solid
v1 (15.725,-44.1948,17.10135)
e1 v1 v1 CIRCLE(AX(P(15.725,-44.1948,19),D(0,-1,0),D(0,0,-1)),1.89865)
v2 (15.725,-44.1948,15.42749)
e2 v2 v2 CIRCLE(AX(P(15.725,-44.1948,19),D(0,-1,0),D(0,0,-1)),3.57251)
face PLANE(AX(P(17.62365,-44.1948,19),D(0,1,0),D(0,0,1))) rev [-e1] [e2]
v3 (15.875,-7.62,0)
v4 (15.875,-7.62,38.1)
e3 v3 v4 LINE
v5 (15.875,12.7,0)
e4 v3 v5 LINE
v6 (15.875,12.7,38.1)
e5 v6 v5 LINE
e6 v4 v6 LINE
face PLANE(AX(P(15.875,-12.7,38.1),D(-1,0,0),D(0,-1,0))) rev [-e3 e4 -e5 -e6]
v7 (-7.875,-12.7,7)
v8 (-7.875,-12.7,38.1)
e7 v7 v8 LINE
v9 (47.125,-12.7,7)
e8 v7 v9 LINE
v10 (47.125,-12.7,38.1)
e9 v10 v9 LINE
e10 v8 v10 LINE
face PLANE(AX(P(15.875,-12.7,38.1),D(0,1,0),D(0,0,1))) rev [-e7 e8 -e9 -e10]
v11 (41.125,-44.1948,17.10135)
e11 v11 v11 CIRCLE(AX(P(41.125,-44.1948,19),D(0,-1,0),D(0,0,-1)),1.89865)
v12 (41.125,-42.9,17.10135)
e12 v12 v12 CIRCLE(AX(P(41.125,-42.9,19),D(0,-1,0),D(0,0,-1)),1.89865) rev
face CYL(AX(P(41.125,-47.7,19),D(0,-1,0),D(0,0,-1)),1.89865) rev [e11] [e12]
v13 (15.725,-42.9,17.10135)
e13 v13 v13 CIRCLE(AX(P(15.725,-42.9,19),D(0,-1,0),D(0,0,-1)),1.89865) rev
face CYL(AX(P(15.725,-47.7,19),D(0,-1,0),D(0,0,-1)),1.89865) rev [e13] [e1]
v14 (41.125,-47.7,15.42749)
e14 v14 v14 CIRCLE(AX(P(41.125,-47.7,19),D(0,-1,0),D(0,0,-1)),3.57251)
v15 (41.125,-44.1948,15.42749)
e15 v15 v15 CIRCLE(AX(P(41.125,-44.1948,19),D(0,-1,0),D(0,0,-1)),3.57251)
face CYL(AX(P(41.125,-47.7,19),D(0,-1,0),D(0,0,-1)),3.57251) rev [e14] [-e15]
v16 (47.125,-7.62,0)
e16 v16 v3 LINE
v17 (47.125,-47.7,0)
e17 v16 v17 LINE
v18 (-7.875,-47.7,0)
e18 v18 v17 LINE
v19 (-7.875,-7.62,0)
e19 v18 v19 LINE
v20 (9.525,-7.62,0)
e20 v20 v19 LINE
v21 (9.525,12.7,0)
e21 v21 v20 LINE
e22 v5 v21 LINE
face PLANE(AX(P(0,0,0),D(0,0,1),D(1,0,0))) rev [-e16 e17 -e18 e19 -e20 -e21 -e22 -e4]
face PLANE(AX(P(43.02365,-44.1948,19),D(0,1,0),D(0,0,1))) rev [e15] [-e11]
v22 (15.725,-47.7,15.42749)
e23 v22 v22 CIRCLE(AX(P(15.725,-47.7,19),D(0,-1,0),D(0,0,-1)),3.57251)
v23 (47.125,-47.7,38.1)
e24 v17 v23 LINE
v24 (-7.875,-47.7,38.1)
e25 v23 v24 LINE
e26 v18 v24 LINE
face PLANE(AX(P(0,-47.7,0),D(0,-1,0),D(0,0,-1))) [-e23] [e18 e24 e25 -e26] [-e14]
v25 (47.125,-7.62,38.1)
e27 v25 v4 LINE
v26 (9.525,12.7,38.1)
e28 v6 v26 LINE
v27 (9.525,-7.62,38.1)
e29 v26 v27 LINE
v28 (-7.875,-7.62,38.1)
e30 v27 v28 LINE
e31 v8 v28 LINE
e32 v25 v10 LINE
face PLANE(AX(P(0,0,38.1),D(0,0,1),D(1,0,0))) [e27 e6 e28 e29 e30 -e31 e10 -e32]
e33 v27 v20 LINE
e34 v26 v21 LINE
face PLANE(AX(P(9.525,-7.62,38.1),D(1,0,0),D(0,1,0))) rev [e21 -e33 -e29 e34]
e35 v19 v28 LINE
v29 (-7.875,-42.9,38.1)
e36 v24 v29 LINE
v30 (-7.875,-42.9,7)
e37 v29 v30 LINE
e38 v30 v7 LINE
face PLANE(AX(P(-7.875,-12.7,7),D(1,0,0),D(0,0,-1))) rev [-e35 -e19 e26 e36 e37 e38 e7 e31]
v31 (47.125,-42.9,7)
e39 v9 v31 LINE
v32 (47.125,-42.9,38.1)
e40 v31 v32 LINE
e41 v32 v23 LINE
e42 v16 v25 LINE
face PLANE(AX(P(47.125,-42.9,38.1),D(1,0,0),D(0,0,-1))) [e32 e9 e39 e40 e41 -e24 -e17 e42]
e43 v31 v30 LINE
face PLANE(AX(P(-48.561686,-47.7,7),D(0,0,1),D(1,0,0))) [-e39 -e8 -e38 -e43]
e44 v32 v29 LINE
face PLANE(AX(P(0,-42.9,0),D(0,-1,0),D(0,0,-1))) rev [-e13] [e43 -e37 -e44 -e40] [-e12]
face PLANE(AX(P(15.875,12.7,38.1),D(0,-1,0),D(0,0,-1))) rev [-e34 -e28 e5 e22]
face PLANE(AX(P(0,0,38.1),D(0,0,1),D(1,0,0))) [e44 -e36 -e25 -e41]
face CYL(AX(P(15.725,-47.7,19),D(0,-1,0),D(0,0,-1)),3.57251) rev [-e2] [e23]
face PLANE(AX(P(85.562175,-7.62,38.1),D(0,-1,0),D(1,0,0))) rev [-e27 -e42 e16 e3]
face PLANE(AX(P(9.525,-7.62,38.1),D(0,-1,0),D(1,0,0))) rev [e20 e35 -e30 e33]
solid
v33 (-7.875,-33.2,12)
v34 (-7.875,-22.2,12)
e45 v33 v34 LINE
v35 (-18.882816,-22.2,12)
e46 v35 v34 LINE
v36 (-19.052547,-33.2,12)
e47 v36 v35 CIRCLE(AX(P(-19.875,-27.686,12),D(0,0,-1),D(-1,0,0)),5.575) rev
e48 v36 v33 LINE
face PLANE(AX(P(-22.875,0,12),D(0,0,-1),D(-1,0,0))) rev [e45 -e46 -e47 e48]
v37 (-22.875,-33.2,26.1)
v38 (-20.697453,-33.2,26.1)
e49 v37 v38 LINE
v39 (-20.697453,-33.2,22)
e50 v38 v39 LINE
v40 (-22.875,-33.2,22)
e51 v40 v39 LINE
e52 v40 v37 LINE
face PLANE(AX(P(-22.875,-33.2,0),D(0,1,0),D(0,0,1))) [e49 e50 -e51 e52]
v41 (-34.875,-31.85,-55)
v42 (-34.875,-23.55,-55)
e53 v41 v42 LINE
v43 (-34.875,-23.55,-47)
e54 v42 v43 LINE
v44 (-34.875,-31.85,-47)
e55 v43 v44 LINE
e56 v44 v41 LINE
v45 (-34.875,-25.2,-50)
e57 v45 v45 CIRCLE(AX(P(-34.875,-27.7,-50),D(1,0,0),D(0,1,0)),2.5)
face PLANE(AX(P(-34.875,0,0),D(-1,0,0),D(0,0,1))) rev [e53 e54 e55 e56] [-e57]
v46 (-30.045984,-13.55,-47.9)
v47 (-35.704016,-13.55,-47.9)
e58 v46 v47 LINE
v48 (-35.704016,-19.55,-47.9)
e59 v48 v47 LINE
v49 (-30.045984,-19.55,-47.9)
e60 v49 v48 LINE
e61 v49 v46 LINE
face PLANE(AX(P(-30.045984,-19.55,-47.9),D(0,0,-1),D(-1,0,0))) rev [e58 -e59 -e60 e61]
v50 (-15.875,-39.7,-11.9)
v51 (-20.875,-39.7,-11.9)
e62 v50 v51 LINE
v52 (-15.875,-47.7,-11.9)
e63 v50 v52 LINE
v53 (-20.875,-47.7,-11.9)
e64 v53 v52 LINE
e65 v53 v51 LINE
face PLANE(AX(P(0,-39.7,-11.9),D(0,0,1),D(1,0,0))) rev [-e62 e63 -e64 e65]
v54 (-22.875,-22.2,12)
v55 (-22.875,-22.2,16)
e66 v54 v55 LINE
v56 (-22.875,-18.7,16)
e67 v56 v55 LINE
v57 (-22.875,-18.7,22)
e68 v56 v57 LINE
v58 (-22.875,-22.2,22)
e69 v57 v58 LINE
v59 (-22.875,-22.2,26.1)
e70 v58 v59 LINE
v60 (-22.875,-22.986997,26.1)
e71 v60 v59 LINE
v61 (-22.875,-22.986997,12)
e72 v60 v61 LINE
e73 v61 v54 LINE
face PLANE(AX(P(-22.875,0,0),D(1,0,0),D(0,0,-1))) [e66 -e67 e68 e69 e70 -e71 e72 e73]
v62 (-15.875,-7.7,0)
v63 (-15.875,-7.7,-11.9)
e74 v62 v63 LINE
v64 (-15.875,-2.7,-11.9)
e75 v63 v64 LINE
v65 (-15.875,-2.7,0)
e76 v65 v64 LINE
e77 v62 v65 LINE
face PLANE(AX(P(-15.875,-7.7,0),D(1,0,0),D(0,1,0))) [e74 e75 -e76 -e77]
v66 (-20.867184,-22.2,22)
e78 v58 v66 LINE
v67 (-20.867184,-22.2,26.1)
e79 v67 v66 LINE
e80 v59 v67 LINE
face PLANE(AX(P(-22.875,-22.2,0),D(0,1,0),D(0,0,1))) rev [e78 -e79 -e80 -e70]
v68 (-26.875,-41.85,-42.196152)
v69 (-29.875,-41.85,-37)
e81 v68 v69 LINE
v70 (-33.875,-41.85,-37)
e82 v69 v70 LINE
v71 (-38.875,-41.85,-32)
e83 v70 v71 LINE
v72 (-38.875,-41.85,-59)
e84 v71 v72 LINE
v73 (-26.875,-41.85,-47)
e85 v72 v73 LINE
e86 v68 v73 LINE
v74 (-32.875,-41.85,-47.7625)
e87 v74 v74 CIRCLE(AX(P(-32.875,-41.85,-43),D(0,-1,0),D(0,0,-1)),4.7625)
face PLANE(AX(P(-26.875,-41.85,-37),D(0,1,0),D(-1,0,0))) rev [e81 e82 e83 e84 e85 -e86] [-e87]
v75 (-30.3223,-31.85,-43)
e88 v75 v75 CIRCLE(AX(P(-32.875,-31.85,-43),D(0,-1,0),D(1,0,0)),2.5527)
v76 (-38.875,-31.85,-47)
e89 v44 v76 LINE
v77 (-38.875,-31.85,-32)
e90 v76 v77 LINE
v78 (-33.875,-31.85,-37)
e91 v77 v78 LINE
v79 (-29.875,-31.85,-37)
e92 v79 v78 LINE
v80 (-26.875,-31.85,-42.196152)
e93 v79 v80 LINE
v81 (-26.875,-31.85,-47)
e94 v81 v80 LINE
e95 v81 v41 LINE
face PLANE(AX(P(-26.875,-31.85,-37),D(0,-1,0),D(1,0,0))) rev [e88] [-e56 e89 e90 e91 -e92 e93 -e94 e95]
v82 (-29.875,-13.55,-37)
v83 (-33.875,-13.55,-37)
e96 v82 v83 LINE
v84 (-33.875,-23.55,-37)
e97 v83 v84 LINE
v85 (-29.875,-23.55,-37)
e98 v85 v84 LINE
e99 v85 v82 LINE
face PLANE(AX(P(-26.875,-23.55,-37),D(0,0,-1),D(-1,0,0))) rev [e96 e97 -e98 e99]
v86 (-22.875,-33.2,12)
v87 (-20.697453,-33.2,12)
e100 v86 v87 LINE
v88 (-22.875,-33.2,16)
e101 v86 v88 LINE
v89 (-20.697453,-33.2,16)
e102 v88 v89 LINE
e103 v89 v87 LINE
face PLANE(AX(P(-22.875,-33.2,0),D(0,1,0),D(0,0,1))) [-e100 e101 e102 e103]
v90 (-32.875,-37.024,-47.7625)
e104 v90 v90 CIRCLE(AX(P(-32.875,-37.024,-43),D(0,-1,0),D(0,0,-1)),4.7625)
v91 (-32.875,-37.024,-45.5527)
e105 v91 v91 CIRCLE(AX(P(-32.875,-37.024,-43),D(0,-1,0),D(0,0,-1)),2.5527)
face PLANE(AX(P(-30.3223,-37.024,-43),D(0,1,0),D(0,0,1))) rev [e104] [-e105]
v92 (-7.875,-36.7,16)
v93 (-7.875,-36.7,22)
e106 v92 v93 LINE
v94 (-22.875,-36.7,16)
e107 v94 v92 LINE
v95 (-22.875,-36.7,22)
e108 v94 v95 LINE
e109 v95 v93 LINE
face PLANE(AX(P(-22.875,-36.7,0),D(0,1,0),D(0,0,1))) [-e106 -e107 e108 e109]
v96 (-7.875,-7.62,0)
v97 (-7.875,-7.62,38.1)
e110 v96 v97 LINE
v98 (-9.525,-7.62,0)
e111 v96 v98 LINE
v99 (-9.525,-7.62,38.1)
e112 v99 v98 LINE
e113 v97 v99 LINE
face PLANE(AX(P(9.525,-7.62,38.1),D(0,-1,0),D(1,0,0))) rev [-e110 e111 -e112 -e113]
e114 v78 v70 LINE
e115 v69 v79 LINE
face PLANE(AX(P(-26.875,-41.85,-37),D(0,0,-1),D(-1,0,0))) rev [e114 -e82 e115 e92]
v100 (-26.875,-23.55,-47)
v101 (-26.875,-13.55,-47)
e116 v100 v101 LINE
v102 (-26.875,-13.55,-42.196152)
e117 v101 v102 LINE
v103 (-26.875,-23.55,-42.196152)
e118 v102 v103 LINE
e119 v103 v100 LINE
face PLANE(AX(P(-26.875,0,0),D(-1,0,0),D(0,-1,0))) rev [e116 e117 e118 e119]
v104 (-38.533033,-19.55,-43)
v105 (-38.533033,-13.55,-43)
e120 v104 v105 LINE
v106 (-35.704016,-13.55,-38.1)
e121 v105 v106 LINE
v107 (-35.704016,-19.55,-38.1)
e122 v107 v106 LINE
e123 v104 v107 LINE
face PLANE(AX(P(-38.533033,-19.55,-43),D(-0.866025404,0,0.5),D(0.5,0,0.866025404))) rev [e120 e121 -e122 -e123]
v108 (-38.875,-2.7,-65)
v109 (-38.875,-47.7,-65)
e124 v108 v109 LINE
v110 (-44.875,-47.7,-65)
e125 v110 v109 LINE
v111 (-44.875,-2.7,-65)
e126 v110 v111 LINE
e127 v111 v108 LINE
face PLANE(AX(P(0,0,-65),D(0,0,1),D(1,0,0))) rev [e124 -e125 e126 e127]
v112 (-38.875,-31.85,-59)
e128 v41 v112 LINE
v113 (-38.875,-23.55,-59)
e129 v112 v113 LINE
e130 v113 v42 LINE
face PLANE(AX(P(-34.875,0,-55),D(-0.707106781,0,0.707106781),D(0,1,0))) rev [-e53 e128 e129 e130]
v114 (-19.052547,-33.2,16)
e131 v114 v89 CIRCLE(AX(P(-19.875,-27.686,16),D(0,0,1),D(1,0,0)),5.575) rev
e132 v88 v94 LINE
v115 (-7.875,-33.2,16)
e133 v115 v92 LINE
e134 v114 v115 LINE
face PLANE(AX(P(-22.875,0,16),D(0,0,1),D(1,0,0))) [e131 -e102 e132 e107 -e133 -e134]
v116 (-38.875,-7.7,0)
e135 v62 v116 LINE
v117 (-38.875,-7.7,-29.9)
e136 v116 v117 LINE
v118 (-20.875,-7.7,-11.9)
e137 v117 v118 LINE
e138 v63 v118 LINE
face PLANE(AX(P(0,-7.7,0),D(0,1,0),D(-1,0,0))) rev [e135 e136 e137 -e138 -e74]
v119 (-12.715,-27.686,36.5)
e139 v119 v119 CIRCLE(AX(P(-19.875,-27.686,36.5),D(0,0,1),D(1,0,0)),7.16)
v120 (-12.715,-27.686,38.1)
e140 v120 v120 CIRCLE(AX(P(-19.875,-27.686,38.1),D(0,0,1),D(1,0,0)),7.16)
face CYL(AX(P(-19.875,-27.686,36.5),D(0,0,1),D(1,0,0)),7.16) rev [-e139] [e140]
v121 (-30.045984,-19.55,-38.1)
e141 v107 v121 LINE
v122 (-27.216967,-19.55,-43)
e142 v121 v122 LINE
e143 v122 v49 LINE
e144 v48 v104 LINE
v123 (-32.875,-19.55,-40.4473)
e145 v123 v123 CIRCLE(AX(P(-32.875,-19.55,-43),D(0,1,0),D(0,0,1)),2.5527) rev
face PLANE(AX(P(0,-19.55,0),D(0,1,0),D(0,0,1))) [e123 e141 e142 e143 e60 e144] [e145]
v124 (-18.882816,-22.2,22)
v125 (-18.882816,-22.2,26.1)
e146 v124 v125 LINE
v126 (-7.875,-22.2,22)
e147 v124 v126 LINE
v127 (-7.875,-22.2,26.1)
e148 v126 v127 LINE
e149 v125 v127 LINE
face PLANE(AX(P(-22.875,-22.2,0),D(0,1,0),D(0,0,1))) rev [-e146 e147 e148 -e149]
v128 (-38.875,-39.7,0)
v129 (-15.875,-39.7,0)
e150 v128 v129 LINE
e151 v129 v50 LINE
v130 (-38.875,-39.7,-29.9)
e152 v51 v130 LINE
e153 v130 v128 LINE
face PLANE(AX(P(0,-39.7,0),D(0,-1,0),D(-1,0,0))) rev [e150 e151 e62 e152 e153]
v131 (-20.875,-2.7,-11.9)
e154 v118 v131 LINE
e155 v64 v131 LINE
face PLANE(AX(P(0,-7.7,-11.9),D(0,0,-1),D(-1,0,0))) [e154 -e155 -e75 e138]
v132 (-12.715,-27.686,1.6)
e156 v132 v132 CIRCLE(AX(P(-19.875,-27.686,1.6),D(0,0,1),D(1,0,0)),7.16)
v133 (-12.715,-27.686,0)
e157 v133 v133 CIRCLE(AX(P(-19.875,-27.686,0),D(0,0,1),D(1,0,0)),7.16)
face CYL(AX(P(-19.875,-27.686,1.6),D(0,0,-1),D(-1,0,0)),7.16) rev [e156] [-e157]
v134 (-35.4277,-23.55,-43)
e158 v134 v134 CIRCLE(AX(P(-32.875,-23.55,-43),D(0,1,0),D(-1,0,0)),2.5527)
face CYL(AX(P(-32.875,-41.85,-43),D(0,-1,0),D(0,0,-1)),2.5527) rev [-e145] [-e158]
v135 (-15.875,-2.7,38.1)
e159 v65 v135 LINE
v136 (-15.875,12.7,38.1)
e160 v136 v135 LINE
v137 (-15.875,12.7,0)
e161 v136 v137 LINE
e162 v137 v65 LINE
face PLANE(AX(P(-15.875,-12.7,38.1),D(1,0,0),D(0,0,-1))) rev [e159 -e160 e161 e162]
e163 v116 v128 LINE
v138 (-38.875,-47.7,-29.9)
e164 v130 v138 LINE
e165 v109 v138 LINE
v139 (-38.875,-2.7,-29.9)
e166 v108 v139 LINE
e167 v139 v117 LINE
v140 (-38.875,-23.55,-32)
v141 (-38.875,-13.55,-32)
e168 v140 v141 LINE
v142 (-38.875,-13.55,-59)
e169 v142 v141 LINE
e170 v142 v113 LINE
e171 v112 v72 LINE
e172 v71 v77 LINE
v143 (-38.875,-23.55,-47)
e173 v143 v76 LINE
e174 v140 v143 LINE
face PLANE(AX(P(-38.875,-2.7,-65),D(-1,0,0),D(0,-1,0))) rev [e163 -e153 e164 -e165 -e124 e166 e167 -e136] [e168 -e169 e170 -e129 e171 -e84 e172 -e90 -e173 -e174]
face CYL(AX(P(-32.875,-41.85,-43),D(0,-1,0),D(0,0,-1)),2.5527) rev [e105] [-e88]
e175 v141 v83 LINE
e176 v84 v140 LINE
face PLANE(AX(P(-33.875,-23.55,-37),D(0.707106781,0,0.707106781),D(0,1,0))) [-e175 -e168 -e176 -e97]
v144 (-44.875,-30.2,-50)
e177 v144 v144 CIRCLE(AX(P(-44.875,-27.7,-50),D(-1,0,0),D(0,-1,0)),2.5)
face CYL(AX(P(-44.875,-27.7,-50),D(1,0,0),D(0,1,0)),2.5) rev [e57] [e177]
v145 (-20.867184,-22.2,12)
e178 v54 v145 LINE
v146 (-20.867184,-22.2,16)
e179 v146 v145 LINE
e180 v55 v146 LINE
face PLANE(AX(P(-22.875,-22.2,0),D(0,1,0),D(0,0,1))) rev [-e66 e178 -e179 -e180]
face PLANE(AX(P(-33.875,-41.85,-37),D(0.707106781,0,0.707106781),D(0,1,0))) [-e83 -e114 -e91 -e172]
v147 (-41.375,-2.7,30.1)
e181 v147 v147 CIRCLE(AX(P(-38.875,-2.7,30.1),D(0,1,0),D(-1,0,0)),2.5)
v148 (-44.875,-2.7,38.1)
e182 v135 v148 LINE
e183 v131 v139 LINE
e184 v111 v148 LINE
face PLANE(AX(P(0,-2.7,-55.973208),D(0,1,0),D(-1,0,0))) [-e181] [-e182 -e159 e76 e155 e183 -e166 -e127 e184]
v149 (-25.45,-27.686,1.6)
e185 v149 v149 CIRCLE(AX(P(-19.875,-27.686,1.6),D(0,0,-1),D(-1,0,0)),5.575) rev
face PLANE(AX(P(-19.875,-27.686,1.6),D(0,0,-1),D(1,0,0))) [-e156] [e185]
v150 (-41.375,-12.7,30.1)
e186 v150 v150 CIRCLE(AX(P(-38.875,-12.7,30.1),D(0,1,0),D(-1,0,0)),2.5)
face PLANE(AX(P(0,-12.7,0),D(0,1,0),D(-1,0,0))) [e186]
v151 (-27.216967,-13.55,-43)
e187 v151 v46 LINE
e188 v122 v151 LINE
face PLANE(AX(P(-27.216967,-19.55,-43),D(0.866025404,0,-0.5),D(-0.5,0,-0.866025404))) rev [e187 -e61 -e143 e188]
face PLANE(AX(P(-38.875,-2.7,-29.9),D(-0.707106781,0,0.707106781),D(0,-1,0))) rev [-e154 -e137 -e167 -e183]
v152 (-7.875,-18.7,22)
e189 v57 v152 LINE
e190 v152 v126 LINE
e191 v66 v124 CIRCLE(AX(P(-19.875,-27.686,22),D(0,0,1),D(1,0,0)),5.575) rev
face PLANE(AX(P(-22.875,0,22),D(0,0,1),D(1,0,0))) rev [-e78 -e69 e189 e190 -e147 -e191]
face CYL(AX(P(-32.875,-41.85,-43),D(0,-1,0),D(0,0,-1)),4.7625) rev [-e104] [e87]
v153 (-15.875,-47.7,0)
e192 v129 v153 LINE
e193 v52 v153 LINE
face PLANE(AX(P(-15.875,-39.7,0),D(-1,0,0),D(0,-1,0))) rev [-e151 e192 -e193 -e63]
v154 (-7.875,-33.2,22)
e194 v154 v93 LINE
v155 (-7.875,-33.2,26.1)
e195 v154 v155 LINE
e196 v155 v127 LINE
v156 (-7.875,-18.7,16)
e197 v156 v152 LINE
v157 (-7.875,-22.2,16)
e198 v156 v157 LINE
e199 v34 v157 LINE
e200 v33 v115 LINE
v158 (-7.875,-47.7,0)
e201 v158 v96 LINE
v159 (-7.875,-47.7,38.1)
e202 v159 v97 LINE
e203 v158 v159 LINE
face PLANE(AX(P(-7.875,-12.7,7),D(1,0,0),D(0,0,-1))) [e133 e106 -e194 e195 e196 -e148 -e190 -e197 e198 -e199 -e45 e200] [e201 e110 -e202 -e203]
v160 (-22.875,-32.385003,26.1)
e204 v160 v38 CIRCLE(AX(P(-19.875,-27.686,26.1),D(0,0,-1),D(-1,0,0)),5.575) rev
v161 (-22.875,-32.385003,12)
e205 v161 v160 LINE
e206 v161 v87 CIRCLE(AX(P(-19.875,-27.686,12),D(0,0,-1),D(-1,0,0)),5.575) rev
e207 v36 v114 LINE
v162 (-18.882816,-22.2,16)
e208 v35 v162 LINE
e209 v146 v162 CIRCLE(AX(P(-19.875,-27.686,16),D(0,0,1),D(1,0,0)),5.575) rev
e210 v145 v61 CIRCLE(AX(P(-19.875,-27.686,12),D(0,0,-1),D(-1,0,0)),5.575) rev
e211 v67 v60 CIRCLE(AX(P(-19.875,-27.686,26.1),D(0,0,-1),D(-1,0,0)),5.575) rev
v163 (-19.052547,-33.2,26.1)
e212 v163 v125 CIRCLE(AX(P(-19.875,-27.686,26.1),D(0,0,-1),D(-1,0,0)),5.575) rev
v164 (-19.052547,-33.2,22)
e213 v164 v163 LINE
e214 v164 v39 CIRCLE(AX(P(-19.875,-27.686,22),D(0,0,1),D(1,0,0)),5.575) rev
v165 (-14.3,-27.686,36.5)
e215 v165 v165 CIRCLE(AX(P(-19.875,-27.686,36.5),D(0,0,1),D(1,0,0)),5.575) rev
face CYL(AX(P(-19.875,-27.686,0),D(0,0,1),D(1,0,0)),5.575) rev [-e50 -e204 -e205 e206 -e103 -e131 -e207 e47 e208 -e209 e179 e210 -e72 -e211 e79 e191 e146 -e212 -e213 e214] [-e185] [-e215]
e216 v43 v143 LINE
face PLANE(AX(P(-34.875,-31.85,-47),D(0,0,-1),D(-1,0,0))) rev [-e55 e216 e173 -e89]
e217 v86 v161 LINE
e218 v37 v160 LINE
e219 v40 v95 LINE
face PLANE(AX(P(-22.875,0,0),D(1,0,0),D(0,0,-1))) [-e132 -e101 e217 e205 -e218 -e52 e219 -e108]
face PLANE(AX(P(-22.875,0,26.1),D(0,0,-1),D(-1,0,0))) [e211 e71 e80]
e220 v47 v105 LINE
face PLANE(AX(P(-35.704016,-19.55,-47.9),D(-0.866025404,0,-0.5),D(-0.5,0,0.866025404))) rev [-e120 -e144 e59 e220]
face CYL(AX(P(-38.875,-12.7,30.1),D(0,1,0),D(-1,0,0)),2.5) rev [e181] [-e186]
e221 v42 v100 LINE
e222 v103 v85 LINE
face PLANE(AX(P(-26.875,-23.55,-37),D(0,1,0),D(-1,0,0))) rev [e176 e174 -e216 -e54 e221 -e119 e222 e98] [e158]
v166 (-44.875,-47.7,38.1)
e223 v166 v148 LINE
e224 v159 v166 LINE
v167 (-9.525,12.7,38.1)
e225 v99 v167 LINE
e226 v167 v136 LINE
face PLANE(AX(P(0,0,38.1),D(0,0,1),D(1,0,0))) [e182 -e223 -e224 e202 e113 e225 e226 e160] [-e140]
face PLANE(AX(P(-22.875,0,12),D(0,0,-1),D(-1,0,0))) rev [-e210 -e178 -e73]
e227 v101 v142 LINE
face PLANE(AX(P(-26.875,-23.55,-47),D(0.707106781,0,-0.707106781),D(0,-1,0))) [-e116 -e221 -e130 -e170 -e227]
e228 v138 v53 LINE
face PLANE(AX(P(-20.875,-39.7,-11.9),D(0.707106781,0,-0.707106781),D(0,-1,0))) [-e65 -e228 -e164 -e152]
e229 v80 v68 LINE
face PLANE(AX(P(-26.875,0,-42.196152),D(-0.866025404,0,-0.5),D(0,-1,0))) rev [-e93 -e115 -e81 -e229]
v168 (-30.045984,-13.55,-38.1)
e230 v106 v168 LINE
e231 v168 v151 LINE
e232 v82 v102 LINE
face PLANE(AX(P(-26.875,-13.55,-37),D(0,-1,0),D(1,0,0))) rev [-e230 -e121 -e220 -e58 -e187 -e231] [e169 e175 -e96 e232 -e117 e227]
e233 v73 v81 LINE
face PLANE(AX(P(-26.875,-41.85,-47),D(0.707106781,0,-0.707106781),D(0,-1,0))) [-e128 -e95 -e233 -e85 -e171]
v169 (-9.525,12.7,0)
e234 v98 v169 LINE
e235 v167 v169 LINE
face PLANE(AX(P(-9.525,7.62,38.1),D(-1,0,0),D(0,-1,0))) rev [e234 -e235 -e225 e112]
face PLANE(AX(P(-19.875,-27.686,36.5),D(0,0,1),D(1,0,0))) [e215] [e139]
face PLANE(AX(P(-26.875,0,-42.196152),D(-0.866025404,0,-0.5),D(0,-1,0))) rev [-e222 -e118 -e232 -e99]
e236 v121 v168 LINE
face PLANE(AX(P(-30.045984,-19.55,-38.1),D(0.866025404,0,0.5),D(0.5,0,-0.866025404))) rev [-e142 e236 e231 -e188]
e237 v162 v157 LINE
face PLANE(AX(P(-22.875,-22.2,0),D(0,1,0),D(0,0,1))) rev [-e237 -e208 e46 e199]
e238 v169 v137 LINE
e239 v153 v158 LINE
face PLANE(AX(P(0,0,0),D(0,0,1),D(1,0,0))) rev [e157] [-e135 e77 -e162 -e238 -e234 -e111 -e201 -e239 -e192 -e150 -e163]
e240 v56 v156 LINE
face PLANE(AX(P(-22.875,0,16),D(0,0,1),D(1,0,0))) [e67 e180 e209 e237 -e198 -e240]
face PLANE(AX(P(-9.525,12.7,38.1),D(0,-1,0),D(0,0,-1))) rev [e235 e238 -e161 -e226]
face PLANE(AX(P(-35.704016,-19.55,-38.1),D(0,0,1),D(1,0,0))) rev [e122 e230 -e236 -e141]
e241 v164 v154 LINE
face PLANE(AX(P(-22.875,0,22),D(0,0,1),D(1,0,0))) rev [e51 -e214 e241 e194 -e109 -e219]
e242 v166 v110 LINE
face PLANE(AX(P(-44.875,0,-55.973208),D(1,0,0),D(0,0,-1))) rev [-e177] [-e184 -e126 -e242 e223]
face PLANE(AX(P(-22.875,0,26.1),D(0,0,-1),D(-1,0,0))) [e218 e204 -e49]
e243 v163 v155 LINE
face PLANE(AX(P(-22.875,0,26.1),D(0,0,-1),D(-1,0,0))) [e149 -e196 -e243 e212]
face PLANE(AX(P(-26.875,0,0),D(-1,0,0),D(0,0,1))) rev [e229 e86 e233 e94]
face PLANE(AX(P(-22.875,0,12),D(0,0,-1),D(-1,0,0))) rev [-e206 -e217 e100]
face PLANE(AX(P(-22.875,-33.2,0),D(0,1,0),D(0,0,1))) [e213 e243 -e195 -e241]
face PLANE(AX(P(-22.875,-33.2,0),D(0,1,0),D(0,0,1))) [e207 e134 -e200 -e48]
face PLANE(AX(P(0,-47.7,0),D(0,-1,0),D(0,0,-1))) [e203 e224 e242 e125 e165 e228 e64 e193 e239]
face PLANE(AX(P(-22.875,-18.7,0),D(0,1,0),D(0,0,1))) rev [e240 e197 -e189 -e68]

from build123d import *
from OCP.BRepFilletAPI import BRepFilletAPI_MakeChamfer

# Parameters (mm, degrees)
BOSS_EXTRUDE1_DEPTH                             = 38.1
BOSS_EXTRUDE2_DEPTH                             = 38.1
SKETCH3_R                                       = 5.575
CUT_EXTRUDE1_DEPTH                              = 74.915259757
SKETCH4_W                                       = 6
SKETCH4_H                                       = 42
BOSS_EXTRUDE3_DEPTH                             = 65
SKETCH6_W                                       = 23
SKETCH6_H                                       = 11.9
BOSS_EXTRUDE4_DEPTH                             = 5
SKETCH10_R                                      = 2.5
CUT_EXTRUDE4_DEPTH                              = 97.024228713
SKETCH12_W                                      = 14.1
SKETCH12_H                                      = 11
SKETCH12_W_2                                    = 6
SKETCH12_H_2                                    = 18
CUT_EXTRUDE5_DEPTH                              = 15
BOSS_EXTRUDE6_DEPTH                             = 3
BOSS_EXTRUDE6_DEPTH_BACK                        = 1.8
SKETCH13_W                                      = 92
SKETCH13_H                                      = 38.1
SKETCH14_R                                      = 1.5
CUT_EXTRUDE6_DEPTH                              = 4.8
SKETCH15_W                                      = 38.1
SKETCH15_H                                      = 5.08
BOSS_EXTRUDE7_DEPTH                             = 31.25
SKETCH17_R                                      = 7.16
CUT_EXTRUDE7_DEPTH                              = 1.6
SKETCH19_W                                      = 7
SKETCH19_H                                      = 40.08
BOSS_EXTRUDE9_DEPTH                             = 55
SKETCH20_W                                      = 10
SKETCH20_H                                      = 10
BOSS_EXTRUDE10_DEPTH                            = 12
CUT_EXTRUDE8_REACH                              = 99.064
SKETCH21_R                                      = 2.5
CHAMFER2_SIZE                                   = 12
BOSS_EXTRUDE11_START                            = 4
SKETCH22_W                                      = 12
SKETCH22_H                                      = 8.3
SKETCH22_R                                      = 2.5
BOSS_EXTRUDE11_DEPTH                            = 4
CHAMFER3_SIZE                                   = 4
CBORE_FOR_10_SOCKET_HEAD_CAP_SCREW1_D           = 5.1054
CBORE_FOR_10_SOCKET_HEAD_CAP_SCREW1_CBORE_D     = 9.525
CBORE_FOR_10_SOCKET_HEAD_CAP_SCREW1_CBORE_DEPTH = 4.826
CUT_EXTRUDE9_DEPTH                              = 6
CHAMFER7_SIZE                                   = 5
CHAMFER8_SIZE                                   = 18
CHAMFER8_OF_MIRROR2_SIZE                        = 18
BOSS_EXTRUDE12_DEPTH                            = 3
CHAMFER10_SIZE                                  = 3
CHAMFER10_SIZE2                                 = 5.196152423
CBORE_START                                     = -47.7
CBORE_FOR_6_SOCKET_HEAD_CAP_SCREW1_OUTL_R       = 3.57251
CBORE_FOR_6_SOCKET_HEAD_CAP_SCREW1_OUTL_R_2     = 1.5
CBORE_FOR_6_SOCKET_HEAD_CAP_SCREW1_DEPTH        = 3.5052
CBORE_START_2                                   = -44.1948
CBORE_FOR_6_SOCKET_HEAD_CAP_SCREW1_2_OU_R       = 1.89865
CBORE_FOR_6_SOCKET_HEAD_CAP_SCREW1_2_OU_R_2     = 1.5
CBORE_FOR_6_SOCKET_HEAD_CAP_SCREW1_2_DEPTH      = 1.2948
SKETCH11_R                                      = 2.5
CUT_EXTRUDE11_DEPTH                             = 10


# Read off the part's stored shape, not the designer's step: CBORE for #6 Socket Head Cap Screw1, Split1
with BuildPart() as part:
    # Sketch1 → Boss-Extrude1 (new body)
    with BuildSketch(Plane.XY):
        Polygon((-9.525, 7.62), (-9.525, 12.7), (-15.875, 12.7), (-15.875, -12.7), (15.875, -12.7), (15.875, 12.7), (9.525, 12.7), (9.525, 7.62), (9.525, -7.62), (-9.525, -7.62), align=None)
    extrude(amount=BOSS_EXTRUDE1_DEPTH)

    # Sketch2 → Boss-Extrude2 (add)
    with BuildSketch(Plane.XY.offset(38.1)):
        Polygon((-44.875, -44.7), (-7.875, -44.7), (-7.875, -12.7), (-15.875, -12.7), (-15.875, -2.7), (-44.875, -2.7), align=None)
    extrude(amount=-BOSS_EXTRUDE2_DEPTH)

    # Sketch3 → Cut-Extrude1 (cut, through all)
    with BuildSketch(Plane.XY.offset(38.1)):
        with Locations((-19.875, -27.686)):
            Circle(SKETCH3_R)
    extrude(amount=-CUT_EXTRUDE1_DEPTH, mode=Mode.SUBTRACT)

    # Sketch4 → Boss-Extrude3 (add)
    with BuildSketch(Plane(origin=(0, 0, 0), x_dir=(-1, 0, 0), z_dir=(0, 0, -1))):
        with Locations((41.875, -23.7)):
            Rectangle(SKETCH4_W, SKETCH4_H)
    extrude(amount=BOSS_EXTRUDE3_DEPTH)

    # Sketch6 → Boss-Extrude4 (add)
    with BuildSketch(Plane(origin=(0, -2.7, 0), x_dir=(1, 0, 0), z_dir=(0, 1, 0))):
        with Locations((-27.375, 5.95)):
            Rectangle(SKETCH6_W, SKETCH6_H)
        Polygon((-38.875, 0), (-38.875, 11.9), (-44.875, 11.9), (-44.875, -38.1), (-15.875, -38.1), (-15.875, 0), align=None)
    boss_extrude4 = extrude(amount=-BOSS_EXTRUDE4_DEPTH)

    # Sketch10 → Cut-Extrude4 (cut, through all)
    with BuildSketch(Plane.ZY.offset(38.875)):
        with Locations(Location((-50, -27.7, 0), (0, 0, 270))):
            Circle(SKETCH10_R)
    extrude(amount=CUT_EXTRUDE4_DEPTH, mode=Mode.SUBTRACT)

    # Sketch12 → Cut-Extrude5 (cut)
    with BuildSketch(Plane(origin=(-7.875, 0, 58.8), x_dir=(0, 0, 1), z_dir=(-1, 0, 0))):
        with Locations((-39.75, -27.7)):
            Rectangle(SKETCH12_W, SKETCH12_H)
        with Locations((-39.8, -27.7)):
            Rectangle(SKETCH12_W_2, SKETCH12_H_2)
    extrude(amount=CUT_EXTRUDE5_DEPTH, mode=Mode.SUBTRACT)

    # Sketch13 → Boss-Extrude6 (add, two sides: drawn at the far end of the back side and taken through both)
    with BuildSketch(Plane.XZ.offset(44.7).offset(-BOSS_EXTRUDE6_DEPTH_BACK)):
        with Locations((1.125, 19.05)):
            Rectangle(SKETCH13_W, SKETCH13_H)
    extrude(amount=BOSS_EXTRUDE6_DEPTH + BOSS_EXTRUDE6_DEPTH_BACK)

    # Sketch14 → Cut-Extrude6 (cut)
    with BuildSketch(Plane.XZ.offset(47.7)):
        with Locations(Location((15.725, 19, 0), (0, 0, 270))):
            Circle(SKETCH14_R)
        with Locations(Location((41.125, 19, 0), (0, 0, 270))):
            Circle(SKETCH14_R)
    extrude(amount=-CUT_EXTRUDE6_DEPTH, mode=Mode.SUBTRACT)

    # Sketch15 → Boss-Extrude7 (add)
    with BuildSketch(Plane(origin=(15.875, 0, 0), x_dir=(0, 0, -1), z_dir=(1, 0, 0))):
        with Locations((-19.05, -10.16)):
            Rectangle(SKETCH15_W, SKETCH15_H)
    extrude(amount=BOSS_EXTRUDE7_DEPTH)

    # Sketch17 → Cut-Extrude7 (cut)
    with BuildSketch(Plane.XY.offset(38.1)):
        with Locations((-19.875, -27.686)):
            Circle(SKETCH17_R)
    cut_extrude7 = extrude(amount=-CUT_EXTRUDE7_DEPTH, mode=Mode.SUBTRACT)

    # Mirror1: Cut-Extrude7 across plane
    add(cut_extrude7.mirror(Plane.XY.offset(19.05)), mode=Mode.SUBTRACT)

    # Sketch19 → Boss-Extrude9 (add)
    with BuildSketch(Plane(origin=(47.125, 0, 0), x_dir=(0, 0, -1), z_dir=(1, 0, 0))):
        with Locations((-3.5, -27.66)):
            Rectangle(SKETCH19_W, SKETCH19_H)
    extrude(amount=-BOSS_EXTRUDE9_DEPTH)

    # Sketch20 → Boss-Extrude10 (add)
    with BuildSketch(Plane(origin=(-38.875, 0, 0), x_dir=(0, 0, -1), z_dir=(1, 0, 0))):
        with Locations((42, -36.85)):
            Rectangle(SKETCH20_W, SKETCH20_H)
        with Locations((42, -18.55)):
            Rectangle(SKETCH20_W, SKETCH20_H)
    extrude(amount=BOSS_EXTRUDE10_DEPTH)

    # Cut-Extrude8: up to this face of the body (flat: up to its plane)
    cut_extrude8_end = Plane(part.part.faces().sort_by_distance((-32.875, -13.55, -42))[0])
    # Sketch21 → Cut-Extrude8 (cut, up to the picked face)
    with BuildSketch(Plane.XZ.offset(41.85), mode=Mode.PRIVATE) as cut_extrude8_sk1:
        with Locations((-32.875, -43)):
            Circle(SKETCH21_R)
    cut_extrude8_tool1 = split(extrude(cut_extrude8_sk1.sketch, amount=-CUT_EXTRUDE8_REACH, mode=Mode.PRIVATE), bisect_by=cut_extrude8_end, keep=Keep.BOTH, mode=Mode.PRIVATE)
    add(cut_extrude8_tool1.solids().sort_by(Axis((-32.875, -41.85, -43), (0, 1, 0)))[0], mode=Mode.SUBTRACT)

    # Chamfer2
    chamfer2_edges = [part.edges().sort_by_distance(p)[0] for p in [
        (-38.875, -18.55, -47),
        (-38.875, -36.85, -47),
    ]]
    chamfer(chamfer2_edges, length=CHAMFER2_SIZE - 0.0001)  # a hair under: the kernel refuses the full size

    # Sketch22 → Boss-Extrude11 (add)
    with BuildSketch(Plane(origin=(-38.875, 0, 0), x_dir=(0, 0, -1), z_dir=(1, 0, 0)).offset(BOSS_EXTRUDE11_START)):
        with Locations((53, -27.7)):
            Rectangle(SKETCH22_W, SKETCH22_H)
        with Locations(Location((50, -27.7, 0), (0, 0, 90))):
            Circle(SKETCH22_R, mode=Mode.SUBTRACT)
    extrude(amount=-BOSS_EXTRUDE11_DEPTH)

    # Chamfer3
    chamfer3_edges = [part.edges().sort_by_distance(p)[0] for p in [
        (-34.875, -27.7, -59),
    ]]
    chamfer(chamfer3_edges, length=CHAMFER3_SIZE - 0.0001)  # a hair under: the kernel refuses the full size

    # CBORE for #10 Socket Head Cap Screw1 (through all)
    with Locations(Plane(origin=(0, -41.85, 0), x_dir=(-1, 0, 0), z_dir=(0, -1, 0))):
        with Locations((32.875, 43)):
            CounterBoreHole(CBORE_FOR_10_SOCKET_HEAD_CAP_SCREW1_D / 2, CBORE_FOR_10_SOCKET_HEAD_CAP_SCREW1_CBORE_D / 2, CBORE_FOR_10_SOCKET_HEAD_CAP_SCREW1_CBORE_DEPTH)

    # Sketch25 → Cut-Extrude9 (cut)
    with BuildSketch(Plane(origin=(0, -13.55, 0), x_dir=(1, 0, 0), z_dir=(0, 1, 0))):
        Polygon((-35.704016319, 38.1), (-30.045983681, 38.1), (-27.216967362, 43), (-30.045983681, 47.9), (-35.704016319, 47.9), (-38.533032638, 43), align=None)
    extrude(amount=-CUT_EXTRUDE9_DEPTH, mode=Mode.SUBTRACT)

    # Chamfer7
    chamfer7_edges = [part.edges().sort_by_distance(p)[0] for p in [
        (-38.875, -36.85, -37),
        (-38.875, -18.55, -37),
    ]]
    chamfer(chamfer7_edges, length=CHAMFER7_SIZE)

    # Chamfer8
    chamfer8_edges = [part.edges().sort_by_distance(p)[0] for p in [
        (-38.875, -5.2, -11.9),
    ]]
    chamfer(chamfer8_edges, length=CHAMFER8_SIZE)

    # Mirror2: Boss-Extrude4 across plane
    add(boss_extrude4.mirror(Plane(origin=(0, -23.7, 0), x_dir=(0, 0, 1), z_dir=(0, -1, 0))))

    # Chamfer8 of Mirror2
    chamfer8_of_mirror2_edges = [part.edges().sort_by_distance(p)[0] for p in [
        (-38.875, -42.2, -11.9),
    ]]
    chamfer(chamfer8_of_mirror2_edges, length=CHAMFER8_OF_MIRROR2_SIZE)

    # Sketch27 → Boss-Extrude12 (add)
    with BuildSketch(Plane.XZ.offset(44.7)):
        Polygon((-15.875, 0), (-44.875, 0), (-44.875, -65), (-38.875, -65), (-38.875, -29.9), (-20.875, -11.9), (-15.875, -11.9), align=None)
    extrude(amount=BOSS_EXTRUDE12_DEPTH)

    # Chamfer10: one chamfer whose edges measure the first distance from different faces: ONE call of the kernel's chamfer builder (chamfer() names one face for all edges)
    chamfer10_edges_1 = [part.edges().sort_by_distance(p)[0] for p in [
        (-26.875, -36.85, -37),
    ]]
    chamfer10_side_1 = [part.faces().sort_by_distance(p)[0] for p in [
        (-30.375, -36.85, -37),
    ]]
    chamfer10_edges_2 = [part.edges().sort_by_distance(p)[0] for p in [
        (-26.875, -18.55, -37),
    ]]
    chamfer10_side_2 = [part.faces().sort_by_distance(p)[0] for p in [
        (-30.375, -18.55, -37),
    ]]
    chamfer10 = BRepFilletAPI_MakeChamfer(part.part.solid().wrapped)
    for e in chamfer10_edges_1:
        chamfer10.Add(CHAMFER10_SIZE, CHAMFER10_SIZE2, e.wrapped, chamfer10_side_1[0].wrapped)  # the first distance lies on this face
    for e in chamfer10_edges_2:
        chamfer10.Add(CHAMFER10_SIZE, CHAMFER10_SIZE2, e.wrapped, chamfer10_side_2[0].wrapped)  # the first distance lies on this face
    add(Compound.cast(chamfer10.Shape()), mode=Mode.REPLACE)

    # CBORE for #6 Socket Head Cap Screw1 outl → CBORE for #6 Socket Head Cap Screw1 (cut)
    # profile 1 of 2: a face of its own
    with BuildSketch(Plane(origin=(0, 0, 0), x_dir=(1, 0, 0), z_dir=(0, 1, 0)).offset(CBORE_START)):
        with Locations((41.125, -19)):
            Circle(CBORE_FOR_6_SOCKET_HEAD_CAP_SCREW1_OUTL_R)
        with Locations((41.125, -19)):
            Circle(CBORE_FOR_6_SOCKET_HEAD_CAP_SCREW1_OUTL_R_2, mode=Mode.SUBTRACT)
    # profile 2 of 2: a face of its own
    with BuildSketch(Plane(origin=(0, 0, 0), x_dir=(1, 0, 0), z_dir=(0, 1, 0)).offset(CBORE_START)):
        with Locations((15.725, -19)):
            Circle(CBORE_FOR_6_SOCKET_HEAD_CAP_SCREW1_OUTL_R)
        with Locations((15.725, -19)):
            Circle(CBORE_FOR_6_SOCKET_HEAD_CAP_SCREW1_OUTL_R_2, mode=Mode.SUBTRACT)
    extrude(amount=CBORE_FOR_6_SOCKET_HEAD_CAP_SCREW1_DEPTH, mode=Mode.SUBTRACT)

    # CBORE for _6 Socket Head Cap Screw1 2 ou → CBORE for _6 Socket Head Cap Screw1 2 (cut)
    # profile 1 of 2: a face of its own
    with BuildSketch(Plane(origin=(0, 0, 0), x_dir=(1, 0, 0), z_dir=(0, 1, 0)).offset(CBORE_START_2)):
        with Locations((41.125, -19)):
            Circle(CBORE_FOR_6_SOCKET_HEAD_CAP_SCREW1_2_OU_R)
        with Locations((41.125, -19)):
            Circle(CBORE_FOR_6_SOCKET_HEAD_CAP_SCREW1_2_OU_R_2, mode=Mode.SUBTRACT)
    # profile 2 of 2: a face of its own
    with BuildSketch(Plane(origin=(0, 0, 0), x_dir=(1, 0, 0), z_dir=(0, 1, 0)).offset(CBORE_START_2)):
        with Locations((15.725, -19)):
            Circle(CBORE_FOR_6_SOCKET_HEAD_CAP_SCREW1_2_OU_R)
        with Locations((15.725, -19)):
            Circle(CBORE_FOR_6_SOCKET_HEAD_CAP_SCREW1_2_OU_R_2, mode=Mode.SUBTRACT)
    extrude(amount=CBORE_FOR_6_SOCKET_HEAD_CAP_SCREW1_2_DEPTH, mode=Mode.SUBTRACT)


with BuildPart() as body_2:
    # Split1: the piece on the far side of the plane
    add(part.part)
    split(bisect_by=Plane.YZ.offset(-7.875), keep=Keep.BOTTOM)

    # Sketch11 → Cut-Extrude11 (cut)
    with BuildSketch(Plane(origin=(0, -2.7, 0), x_dir=(1, 0, 0), z_dir=(0, 1, 0))):
        with Locations(Location((-38.875, -30.1, 0), (0, 0, 180))):
            Circle(SKETCH11_R)
    extrude(amount=-CUT_EXTRUDE11_DEPTH, mode=Mode.SUBTRACT)


with BuildPart() as part_1:
    add(part.part)

    # Split1
    split(bisect_by=Plane.YZ.offset(-7.875), keep=Keep.TOP)


solid = Compound([body_2.part, part_1.part])
